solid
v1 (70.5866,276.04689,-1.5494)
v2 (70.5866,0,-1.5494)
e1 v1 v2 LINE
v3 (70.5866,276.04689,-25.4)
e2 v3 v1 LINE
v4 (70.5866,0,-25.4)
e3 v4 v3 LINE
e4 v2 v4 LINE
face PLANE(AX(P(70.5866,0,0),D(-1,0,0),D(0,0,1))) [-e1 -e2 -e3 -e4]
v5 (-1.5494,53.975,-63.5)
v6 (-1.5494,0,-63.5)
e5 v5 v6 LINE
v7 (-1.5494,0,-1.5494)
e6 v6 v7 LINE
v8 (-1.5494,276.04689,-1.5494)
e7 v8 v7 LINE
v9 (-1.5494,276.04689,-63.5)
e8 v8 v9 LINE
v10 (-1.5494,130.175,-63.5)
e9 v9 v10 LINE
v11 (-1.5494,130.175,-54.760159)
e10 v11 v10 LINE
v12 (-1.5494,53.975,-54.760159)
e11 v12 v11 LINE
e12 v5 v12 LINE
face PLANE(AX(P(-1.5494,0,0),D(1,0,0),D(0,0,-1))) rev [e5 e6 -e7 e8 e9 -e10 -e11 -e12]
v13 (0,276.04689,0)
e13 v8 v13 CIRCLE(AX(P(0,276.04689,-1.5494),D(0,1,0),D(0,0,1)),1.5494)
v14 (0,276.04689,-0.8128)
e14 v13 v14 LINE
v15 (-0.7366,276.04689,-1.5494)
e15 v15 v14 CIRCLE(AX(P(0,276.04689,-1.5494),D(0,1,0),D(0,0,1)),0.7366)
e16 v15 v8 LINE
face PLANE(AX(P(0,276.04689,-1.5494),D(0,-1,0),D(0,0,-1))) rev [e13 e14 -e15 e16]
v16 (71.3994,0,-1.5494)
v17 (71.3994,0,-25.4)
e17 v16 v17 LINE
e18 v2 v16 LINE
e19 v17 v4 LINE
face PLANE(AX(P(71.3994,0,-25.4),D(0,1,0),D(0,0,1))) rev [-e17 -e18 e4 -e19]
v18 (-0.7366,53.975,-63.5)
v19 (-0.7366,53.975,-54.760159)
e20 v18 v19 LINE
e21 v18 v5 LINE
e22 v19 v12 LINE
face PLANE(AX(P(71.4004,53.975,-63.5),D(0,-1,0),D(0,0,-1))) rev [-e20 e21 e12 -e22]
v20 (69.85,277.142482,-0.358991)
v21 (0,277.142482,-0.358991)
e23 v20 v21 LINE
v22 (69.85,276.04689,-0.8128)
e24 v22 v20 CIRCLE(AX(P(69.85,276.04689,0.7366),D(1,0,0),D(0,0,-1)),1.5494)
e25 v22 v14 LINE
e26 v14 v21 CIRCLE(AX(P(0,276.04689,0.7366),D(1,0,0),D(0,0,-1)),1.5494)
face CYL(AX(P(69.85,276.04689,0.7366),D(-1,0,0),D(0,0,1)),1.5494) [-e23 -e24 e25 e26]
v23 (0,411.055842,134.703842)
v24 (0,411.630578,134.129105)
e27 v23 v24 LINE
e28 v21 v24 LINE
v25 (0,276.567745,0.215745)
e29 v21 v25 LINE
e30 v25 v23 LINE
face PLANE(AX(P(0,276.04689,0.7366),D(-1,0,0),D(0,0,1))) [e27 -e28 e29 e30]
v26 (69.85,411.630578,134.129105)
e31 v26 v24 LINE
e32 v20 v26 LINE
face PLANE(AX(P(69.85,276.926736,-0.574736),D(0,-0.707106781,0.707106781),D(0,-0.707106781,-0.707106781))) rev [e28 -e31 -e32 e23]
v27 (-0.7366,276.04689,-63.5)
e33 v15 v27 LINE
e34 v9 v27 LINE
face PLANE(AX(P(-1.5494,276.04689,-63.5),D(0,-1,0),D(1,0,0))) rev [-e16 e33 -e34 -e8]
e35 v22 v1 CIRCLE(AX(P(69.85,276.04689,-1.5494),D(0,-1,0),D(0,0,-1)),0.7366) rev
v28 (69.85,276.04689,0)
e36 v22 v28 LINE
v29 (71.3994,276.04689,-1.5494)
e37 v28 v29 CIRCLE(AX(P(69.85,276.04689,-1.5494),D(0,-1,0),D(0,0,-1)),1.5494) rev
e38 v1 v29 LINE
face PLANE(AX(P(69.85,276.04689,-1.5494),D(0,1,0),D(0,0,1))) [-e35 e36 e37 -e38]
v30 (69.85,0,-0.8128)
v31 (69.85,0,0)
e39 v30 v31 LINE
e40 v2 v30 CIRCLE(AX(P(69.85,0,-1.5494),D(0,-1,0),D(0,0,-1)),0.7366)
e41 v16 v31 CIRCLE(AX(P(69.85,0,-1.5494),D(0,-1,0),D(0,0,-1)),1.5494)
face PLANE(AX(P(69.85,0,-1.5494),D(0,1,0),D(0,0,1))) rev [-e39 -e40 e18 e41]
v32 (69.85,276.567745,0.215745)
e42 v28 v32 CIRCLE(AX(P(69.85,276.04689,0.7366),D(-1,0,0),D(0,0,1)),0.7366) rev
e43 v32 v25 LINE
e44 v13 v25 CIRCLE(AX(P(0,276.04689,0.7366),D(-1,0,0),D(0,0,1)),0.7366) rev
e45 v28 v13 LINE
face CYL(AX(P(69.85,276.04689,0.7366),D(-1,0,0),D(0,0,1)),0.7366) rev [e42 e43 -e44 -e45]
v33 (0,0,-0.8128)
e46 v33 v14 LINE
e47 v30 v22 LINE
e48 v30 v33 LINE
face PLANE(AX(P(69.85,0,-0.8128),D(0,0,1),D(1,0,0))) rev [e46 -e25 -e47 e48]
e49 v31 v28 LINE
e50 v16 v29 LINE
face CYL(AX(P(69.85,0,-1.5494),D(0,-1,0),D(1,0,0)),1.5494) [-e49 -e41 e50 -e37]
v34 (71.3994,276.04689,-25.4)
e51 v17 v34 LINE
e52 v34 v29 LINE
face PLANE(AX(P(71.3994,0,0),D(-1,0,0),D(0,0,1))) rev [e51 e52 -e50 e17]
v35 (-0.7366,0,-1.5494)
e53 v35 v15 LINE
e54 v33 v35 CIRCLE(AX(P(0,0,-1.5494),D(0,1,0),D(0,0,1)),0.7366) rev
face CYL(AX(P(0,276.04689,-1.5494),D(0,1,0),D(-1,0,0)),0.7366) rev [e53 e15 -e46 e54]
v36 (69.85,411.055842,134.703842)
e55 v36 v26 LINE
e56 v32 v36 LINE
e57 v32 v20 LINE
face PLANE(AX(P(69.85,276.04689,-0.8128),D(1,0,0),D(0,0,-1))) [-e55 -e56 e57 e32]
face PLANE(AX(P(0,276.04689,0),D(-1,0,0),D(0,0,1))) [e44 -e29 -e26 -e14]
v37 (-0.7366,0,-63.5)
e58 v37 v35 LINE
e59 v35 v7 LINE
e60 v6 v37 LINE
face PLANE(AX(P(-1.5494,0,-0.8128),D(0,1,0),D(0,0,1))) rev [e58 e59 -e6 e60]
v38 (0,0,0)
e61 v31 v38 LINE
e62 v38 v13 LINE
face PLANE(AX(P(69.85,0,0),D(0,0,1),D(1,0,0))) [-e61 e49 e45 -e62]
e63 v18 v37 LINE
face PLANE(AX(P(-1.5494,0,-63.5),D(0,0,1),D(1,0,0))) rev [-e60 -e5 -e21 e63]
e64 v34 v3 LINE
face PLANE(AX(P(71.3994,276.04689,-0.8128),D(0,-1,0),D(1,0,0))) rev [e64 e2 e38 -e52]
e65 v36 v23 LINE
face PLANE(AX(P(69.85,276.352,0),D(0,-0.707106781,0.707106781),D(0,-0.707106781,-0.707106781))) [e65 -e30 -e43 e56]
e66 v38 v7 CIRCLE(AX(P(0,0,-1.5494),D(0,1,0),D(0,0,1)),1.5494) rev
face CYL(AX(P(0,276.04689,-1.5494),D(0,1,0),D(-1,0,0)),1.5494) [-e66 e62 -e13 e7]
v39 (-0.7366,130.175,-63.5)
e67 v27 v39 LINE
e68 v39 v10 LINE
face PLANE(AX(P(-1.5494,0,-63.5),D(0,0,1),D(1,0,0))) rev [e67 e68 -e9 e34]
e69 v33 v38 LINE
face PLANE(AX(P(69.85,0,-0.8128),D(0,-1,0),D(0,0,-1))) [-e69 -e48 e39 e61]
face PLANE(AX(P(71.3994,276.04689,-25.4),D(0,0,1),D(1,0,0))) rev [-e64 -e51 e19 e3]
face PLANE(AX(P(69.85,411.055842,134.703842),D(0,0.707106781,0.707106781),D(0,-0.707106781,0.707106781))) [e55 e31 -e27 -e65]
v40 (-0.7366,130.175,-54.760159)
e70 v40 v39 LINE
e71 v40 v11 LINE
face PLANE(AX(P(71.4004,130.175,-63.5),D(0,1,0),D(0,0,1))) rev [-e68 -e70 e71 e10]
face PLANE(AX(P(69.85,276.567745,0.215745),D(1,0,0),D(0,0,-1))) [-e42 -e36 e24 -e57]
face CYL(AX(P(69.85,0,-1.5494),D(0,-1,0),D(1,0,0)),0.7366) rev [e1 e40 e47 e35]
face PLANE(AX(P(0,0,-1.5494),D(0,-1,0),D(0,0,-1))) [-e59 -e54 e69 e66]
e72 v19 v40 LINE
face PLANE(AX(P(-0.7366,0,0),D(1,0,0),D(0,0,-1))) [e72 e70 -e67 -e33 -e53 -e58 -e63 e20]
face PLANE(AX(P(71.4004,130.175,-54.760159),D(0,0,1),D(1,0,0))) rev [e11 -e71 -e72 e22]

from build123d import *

# Parameters (mm, degrees)
BASE_FLANGE1_DEPTH = 69.85
EDGE_FLANGE1_DEPTH = 276.04689029
EDGE_FLANGE3_DEPTH = 276.04689029
CUT_EXTRUDE1_REACH = 441.211
SKETCH16_W         = 8.739840912
SKETCH16_H         = 76.2


# Sheet-metal steps are written as plain solids
with BuildPart() as part:
    # Sketch1 → Base-Flange1 (new body)
    with BuildSketch(Plane(origin=(0, 0, 0), x_dir=(0, 0, -1), z_dir=(1, 0, 0))):
        with BuildLine():
            Line((0, 0), (0, 276.04689029))
            ThreePointArc((0, 276.04689029), (-0.056070336, 276.328774906), (-0.215745145, 276.567745145))
            Line((-0.215745145, 276.567745145), (-134.703841816, 411.055841816))
            Line((-134.703841816, 411.055841816), (-134.129105424, 411.630578208))
            Line((-134.129105424, 411.630578208), (0.358991247, 277.142481537))
            ThreePointArc((0.358991247, 277.142481537), (0.694858948, 276.63982), (0.8128, 276.04689029))
            Line((0.8128, 276.04689029), (0.8128, 0))
            Line((0.8128, 0), (0, 0))
        make_face()
    extrude(amount=BASE_FLANGE1_DEPTH)

    # Edge-Flange1 section (across the edge) → Edge-Flange1 (add)
    with BuildSketch(Plane(origin=(70.5866, 276.04689029, -0.8128), x_dir=(-1, 0, 0), z_dir=(0, -1, 0))):
        with BuildLine():
            Line((-0.8128, 0.7366), (-0.8128, 24.5872))
            Line((-0.8128, 24.5872), (0, 24.5872))
            Line((0, 24.5872), (0, 0.7366))
            ThreePointArc((0, 0.7366), (0.215745145, 0.215745145), (0.7366, 0))
            Line((0.7366, 0), (0.7366, -0.8128))
            ThreePointArc((0.7366, -0.8128), (-0.358991247, -0.358991247), (-0.8128, 0.7366))
        make_face()
    extrude(amount=EDGE_FLANGE1_DEPTH)

    # Edge-Flange3 section (across the edge) → Edge-Flange3 (add)
    with BuildSketch(Plane(origin=(-0.7366, 0, -0.8128), x_dir=(1, 0, 0), z_dir=(0, 1, 0))):
        with BuildLine():
            Line((-0.8128, 0.7366), (-0.8128, 62.6872))
            Line((-0.8128, 62.6872), (0, 62.6872))
            Line((0, 62.6872), (0, 0.7366))
            ThreePointArc((0, 0.7366), (0.215745145, 0.215745145), (0.7366, 0))
            Line((0.7366, 0), (0.7366, -0.8128))
            ThreePointArc((0.7366, -0.8128), (-0.358991247, -0.358991247), (-0.8128, 0.7366))
        make_face()
    extrude(amount=EDGE_FLANGE3_DEPTH)

    # Sketch16 → Cut-Extrude1 (cut, up to next)
    with BuildSketch(Plane.ZY.offset(1.5494), mode=Mode.PRIVATE) as cut_extrude1_sk1:
        with Locations((-59.130079544, 92.075)):
            Rectangle(SKETCH16_W, SKETCH16_H)
    cut_extrude1_tool1 = extrude(cut_extrude1_sk1.sketch, amount=-CUT_EXTRUDE1_REACH, mode=Mode.PRIVATE) & part.part
    add(cut_extrude1_tool1.solids().sort_by_distance((-1.5494, 92.075, -59.13008))[0], mode=Mode.SUBTRACT)


solid = part.part
